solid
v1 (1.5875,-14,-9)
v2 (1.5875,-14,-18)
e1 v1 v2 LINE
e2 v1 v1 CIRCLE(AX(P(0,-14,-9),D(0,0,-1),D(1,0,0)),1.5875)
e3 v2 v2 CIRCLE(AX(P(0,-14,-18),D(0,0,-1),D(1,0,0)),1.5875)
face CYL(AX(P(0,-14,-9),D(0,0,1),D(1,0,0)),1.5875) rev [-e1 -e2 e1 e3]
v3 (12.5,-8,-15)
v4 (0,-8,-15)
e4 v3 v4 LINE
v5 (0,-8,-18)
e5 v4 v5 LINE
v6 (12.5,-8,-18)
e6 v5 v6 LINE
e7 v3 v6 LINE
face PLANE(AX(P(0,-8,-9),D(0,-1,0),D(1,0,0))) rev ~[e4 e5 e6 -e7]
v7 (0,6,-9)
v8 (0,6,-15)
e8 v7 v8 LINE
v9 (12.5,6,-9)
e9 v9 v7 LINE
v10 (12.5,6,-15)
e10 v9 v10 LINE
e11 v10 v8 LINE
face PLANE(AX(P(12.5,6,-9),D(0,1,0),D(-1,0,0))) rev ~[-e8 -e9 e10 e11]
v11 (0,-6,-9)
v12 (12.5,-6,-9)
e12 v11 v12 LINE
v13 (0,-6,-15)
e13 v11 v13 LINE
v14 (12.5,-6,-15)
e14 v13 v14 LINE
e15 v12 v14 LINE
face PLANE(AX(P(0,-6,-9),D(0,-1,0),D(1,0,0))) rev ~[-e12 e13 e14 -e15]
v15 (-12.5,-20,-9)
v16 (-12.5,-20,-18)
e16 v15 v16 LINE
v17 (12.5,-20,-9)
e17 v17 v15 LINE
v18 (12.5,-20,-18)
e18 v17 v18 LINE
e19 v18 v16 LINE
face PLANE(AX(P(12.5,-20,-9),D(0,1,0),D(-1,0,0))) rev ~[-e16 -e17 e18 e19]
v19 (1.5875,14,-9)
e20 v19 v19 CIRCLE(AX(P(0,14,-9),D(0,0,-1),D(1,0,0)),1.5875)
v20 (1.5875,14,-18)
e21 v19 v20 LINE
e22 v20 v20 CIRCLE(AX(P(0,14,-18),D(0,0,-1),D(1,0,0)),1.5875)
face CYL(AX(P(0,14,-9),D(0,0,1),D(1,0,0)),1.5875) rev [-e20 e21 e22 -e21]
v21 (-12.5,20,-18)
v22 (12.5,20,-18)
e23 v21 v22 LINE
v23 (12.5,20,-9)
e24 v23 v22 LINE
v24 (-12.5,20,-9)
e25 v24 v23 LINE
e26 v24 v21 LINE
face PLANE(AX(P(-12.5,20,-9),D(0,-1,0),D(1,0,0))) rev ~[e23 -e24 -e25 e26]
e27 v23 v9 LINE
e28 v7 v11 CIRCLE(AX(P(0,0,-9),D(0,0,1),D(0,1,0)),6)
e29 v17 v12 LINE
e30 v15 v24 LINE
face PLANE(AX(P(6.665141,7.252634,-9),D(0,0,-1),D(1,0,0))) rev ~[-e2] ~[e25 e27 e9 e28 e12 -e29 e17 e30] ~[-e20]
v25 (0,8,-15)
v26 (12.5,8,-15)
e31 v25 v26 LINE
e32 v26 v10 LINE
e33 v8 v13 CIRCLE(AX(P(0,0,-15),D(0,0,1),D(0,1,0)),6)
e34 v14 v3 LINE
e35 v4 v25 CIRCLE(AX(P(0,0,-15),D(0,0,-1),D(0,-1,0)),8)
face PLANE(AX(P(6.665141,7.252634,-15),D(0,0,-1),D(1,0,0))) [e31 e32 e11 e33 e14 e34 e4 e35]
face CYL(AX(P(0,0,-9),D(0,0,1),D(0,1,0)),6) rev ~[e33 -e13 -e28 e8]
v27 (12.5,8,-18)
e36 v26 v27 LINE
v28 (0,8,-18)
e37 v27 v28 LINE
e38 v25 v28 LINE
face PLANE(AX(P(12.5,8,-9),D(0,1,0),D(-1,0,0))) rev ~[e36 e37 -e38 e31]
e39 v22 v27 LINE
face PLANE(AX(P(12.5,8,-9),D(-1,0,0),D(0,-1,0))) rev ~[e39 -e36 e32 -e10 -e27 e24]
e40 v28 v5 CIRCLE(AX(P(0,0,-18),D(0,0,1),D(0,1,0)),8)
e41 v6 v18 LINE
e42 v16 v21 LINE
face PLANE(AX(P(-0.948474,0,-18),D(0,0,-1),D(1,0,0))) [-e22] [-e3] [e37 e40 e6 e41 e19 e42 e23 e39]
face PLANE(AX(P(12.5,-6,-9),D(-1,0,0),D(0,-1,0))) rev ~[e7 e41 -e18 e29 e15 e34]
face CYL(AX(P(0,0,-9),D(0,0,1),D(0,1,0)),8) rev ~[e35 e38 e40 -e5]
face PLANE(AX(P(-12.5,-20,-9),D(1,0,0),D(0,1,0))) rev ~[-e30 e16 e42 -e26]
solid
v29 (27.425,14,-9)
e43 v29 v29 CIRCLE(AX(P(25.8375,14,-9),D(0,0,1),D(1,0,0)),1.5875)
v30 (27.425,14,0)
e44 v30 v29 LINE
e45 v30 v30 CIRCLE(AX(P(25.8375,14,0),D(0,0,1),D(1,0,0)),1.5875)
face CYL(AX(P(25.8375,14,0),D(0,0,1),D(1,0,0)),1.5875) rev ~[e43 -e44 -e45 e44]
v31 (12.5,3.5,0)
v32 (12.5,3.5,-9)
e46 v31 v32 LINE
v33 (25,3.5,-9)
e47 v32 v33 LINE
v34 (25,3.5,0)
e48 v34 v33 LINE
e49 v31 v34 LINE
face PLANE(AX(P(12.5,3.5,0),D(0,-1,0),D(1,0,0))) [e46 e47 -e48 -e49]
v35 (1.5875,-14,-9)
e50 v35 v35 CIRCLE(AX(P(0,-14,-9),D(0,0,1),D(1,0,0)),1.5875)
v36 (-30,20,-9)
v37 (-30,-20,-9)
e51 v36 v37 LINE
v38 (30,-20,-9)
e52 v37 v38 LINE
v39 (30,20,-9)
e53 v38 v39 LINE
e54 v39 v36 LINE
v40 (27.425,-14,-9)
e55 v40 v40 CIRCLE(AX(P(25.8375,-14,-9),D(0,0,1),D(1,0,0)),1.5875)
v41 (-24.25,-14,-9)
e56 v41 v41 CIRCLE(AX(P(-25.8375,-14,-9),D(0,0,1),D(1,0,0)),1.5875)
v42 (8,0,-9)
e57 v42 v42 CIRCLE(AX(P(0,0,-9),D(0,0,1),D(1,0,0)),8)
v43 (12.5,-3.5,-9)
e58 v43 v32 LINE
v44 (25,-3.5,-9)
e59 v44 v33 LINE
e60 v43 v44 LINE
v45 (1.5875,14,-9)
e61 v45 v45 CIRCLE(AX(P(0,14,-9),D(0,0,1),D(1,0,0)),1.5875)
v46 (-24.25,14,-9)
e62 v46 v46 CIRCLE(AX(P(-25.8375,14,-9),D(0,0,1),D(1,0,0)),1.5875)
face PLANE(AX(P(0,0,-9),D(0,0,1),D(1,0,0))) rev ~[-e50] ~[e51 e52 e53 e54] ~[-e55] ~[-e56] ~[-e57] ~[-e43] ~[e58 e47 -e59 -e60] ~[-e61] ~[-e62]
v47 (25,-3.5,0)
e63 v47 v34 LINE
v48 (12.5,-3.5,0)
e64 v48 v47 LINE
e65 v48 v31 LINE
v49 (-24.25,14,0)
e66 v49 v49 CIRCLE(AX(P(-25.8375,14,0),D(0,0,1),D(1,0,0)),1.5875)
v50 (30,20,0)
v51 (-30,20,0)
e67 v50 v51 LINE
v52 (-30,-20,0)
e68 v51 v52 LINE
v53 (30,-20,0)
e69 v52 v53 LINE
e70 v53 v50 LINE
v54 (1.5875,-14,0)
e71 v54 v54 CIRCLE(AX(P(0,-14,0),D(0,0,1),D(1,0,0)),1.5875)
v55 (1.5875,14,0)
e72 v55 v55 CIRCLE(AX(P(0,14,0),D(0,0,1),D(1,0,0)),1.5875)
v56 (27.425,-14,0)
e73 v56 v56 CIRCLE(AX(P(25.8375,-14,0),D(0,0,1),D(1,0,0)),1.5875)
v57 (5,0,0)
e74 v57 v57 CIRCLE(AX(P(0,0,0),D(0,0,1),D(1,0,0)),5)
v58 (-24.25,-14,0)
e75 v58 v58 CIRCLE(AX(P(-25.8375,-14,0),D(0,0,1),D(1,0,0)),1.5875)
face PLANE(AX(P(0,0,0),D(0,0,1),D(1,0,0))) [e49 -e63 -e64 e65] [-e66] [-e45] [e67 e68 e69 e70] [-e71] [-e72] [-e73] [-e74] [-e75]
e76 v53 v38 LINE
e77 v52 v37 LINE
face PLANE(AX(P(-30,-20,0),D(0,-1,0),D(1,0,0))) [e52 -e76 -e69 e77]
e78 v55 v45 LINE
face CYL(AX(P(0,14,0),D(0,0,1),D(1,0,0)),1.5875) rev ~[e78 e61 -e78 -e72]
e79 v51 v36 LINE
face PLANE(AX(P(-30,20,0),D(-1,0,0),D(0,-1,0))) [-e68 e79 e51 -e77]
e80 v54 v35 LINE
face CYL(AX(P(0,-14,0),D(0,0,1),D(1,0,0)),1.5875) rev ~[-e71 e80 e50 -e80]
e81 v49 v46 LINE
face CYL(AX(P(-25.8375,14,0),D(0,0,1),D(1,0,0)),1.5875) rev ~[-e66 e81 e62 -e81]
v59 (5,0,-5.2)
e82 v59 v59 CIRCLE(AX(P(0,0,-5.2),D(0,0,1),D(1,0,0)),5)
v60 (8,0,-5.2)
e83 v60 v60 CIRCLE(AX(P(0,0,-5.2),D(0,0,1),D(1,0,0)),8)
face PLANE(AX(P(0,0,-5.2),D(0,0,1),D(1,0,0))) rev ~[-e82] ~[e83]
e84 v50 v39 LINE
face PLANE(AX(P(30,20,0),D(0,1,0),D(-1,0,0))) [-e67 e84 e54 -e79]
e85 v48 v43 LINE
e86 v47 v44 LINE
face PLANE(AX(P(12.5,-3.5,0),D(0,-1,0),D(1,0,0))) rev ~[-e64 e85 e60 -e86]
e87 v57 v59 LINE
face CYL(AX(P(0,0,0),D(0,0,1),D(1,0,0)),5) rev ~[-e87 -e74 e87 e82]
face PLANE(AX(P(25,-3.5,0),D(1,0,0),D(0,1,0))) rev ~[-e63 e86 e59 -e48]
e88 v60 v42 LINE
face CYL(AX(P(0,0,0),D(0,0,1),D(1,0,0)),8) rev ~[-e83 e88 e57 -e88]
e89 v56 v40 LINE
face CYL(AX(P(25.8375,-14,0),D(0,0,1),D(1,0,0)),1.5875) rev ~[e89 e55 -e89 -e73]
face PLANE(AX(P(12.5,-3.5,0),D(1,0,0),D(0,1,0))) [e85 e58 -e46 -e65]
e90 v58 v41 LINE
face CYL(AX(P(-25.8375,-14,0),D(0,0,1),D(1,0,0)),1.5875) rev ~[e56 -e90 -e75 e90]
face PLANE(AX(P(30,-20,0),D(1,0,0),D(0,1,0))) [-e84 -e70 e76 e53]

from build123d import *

# Parameters (mm, degrees)
F0_R     = 1.5875
F0_R_2   = 8
F0_W     = 12.5
F0_H     = 7
F1_DEPTH = 9
F0_R_3   = 5
F2_DEPTH = 5.2
F3_R     = 1.5875
F4_DEPTH = 9
F5_DEPTH = 6


with BuildPart() as f1:
    # F0 (on Top) → F1 (new body)
    with BuildSketch(Plane.XY):
        Polygon((30, -20), (30, 20), (-30, 20), (-30, -20), (-24.25, -20), (24.25, -20), align=None)
        with Locations((-25.8375, -14)):
            Circle(F0_R, mode=Mode.SUBTRACT)
        with Locations((-25.8375, 14)):
            Circle(F0_R, mode=Mode.SUBTRACT)
        with Locations((0, -14)):
            Circle(F0_R, mode=Mode.SUBTRACT)
        with Locations((25.8375, -14)):
            Circle(F0_R, mode=Mode.SUBTRACT)
        Circle(F0_R_2, mode=Mode.SUBTRACT)
        with Locations((0, 14)):
            Circle(F0_R, mode=Mode.SUBTRACT)
        with Locations((18.75, 0)):
            Rectangle(F0_W, F0_H, mode=Mode.SUBTRACT)
        with Locations((25.8375, 14)):
            Circle(F0_R, mode=Mode.SUBTRACT)
    extrude(amount=-F1_DEPTH)

    # F0 (on Top) → F2 (join, through all)
    with BuildSketch(Plane.XY):
        Circle(F0_R_2)
        Circle(F0_R_3, mode=Mode.SUBTRACT)
    extrude(amount=-F2_DEPTH)


with BuildPart() as f4:
    # F3 (on face) → F4 (new body)
    with BuildSketch(Plane(origin=(0, 0, -9), x_dir=(1, 0, 0), z_dir=(0, 0, -1))):
        with BuildLine():
            Line((12.5, 20), (-12.5, 20))
            Line((-12.5, 20), (-12.5, -20))
            Line((-12.5, -20), (12.5, -20))
            Line((12.5, -20), (12.5, -8))
            Line((12.5, -8), (0, -8))
            ThreePointArc((0, -8), (-8, 0), (0, 8))
            Line((0, 8), (12.5, 8))
            Line((12.5, 8), (12.5, 20))
        make_face()
        with Locations((0, -14)):
            Circle(F3_R, mode=Mode.SUBTRACT)
        with Locations((0, 14)):
            Circle(F3_R, mode=Mode.SUBTRACT)
    extrude(amount=F4_DEPTH)

    # F3 (on face) → F5 (join)
    with BuildSketch(Plane(origin=(0, 0, -9), x_dir=(1, 0, 0), z_dir=(0, 0, -1))):
        with BuildLine():
            Line((0, -8), (12.5, -8))
            Line((12.5, -8), (12.5, -6))
            Line((12.5, -6), (5.2915026221, -6))
            ThreePointArc((5.2915026221, -6), (2.8284271247, -7.4833147735), (0, -8))
        make_face()
        with BuildLine():
            ThreePointArc((5.2915026221, 6), (2.8284271247, 7.4833147735), (0, 8))
            ThreePointArc((0, 8), (-8, 0), (0, -8))
            ThreePointArc((0, -8), (2.8284271247, -7.4833147735), (5.2915026221, -6))
            Line((5.2915026221, -6), (0, -6))
            ThreePointArc((0, -6), (-6, 0), (0, 6))
            Line((0, 6), (5.2915026221, 6))
        make_face()
        with BuildLine():
            Line((12.5, 6), (12.5, 8))
            Line((12.5, 8), (0, 8))
            ThreePointArc((0, 8), (2.8284271247, 7.4833147735), (5.2915026221, 6))
            Line((5.2915026221, 6), (12.5, 6))
        make_face()
    extrude(amount=F5_DEPTH)


solid = Compound([f1.part, f4.part])
